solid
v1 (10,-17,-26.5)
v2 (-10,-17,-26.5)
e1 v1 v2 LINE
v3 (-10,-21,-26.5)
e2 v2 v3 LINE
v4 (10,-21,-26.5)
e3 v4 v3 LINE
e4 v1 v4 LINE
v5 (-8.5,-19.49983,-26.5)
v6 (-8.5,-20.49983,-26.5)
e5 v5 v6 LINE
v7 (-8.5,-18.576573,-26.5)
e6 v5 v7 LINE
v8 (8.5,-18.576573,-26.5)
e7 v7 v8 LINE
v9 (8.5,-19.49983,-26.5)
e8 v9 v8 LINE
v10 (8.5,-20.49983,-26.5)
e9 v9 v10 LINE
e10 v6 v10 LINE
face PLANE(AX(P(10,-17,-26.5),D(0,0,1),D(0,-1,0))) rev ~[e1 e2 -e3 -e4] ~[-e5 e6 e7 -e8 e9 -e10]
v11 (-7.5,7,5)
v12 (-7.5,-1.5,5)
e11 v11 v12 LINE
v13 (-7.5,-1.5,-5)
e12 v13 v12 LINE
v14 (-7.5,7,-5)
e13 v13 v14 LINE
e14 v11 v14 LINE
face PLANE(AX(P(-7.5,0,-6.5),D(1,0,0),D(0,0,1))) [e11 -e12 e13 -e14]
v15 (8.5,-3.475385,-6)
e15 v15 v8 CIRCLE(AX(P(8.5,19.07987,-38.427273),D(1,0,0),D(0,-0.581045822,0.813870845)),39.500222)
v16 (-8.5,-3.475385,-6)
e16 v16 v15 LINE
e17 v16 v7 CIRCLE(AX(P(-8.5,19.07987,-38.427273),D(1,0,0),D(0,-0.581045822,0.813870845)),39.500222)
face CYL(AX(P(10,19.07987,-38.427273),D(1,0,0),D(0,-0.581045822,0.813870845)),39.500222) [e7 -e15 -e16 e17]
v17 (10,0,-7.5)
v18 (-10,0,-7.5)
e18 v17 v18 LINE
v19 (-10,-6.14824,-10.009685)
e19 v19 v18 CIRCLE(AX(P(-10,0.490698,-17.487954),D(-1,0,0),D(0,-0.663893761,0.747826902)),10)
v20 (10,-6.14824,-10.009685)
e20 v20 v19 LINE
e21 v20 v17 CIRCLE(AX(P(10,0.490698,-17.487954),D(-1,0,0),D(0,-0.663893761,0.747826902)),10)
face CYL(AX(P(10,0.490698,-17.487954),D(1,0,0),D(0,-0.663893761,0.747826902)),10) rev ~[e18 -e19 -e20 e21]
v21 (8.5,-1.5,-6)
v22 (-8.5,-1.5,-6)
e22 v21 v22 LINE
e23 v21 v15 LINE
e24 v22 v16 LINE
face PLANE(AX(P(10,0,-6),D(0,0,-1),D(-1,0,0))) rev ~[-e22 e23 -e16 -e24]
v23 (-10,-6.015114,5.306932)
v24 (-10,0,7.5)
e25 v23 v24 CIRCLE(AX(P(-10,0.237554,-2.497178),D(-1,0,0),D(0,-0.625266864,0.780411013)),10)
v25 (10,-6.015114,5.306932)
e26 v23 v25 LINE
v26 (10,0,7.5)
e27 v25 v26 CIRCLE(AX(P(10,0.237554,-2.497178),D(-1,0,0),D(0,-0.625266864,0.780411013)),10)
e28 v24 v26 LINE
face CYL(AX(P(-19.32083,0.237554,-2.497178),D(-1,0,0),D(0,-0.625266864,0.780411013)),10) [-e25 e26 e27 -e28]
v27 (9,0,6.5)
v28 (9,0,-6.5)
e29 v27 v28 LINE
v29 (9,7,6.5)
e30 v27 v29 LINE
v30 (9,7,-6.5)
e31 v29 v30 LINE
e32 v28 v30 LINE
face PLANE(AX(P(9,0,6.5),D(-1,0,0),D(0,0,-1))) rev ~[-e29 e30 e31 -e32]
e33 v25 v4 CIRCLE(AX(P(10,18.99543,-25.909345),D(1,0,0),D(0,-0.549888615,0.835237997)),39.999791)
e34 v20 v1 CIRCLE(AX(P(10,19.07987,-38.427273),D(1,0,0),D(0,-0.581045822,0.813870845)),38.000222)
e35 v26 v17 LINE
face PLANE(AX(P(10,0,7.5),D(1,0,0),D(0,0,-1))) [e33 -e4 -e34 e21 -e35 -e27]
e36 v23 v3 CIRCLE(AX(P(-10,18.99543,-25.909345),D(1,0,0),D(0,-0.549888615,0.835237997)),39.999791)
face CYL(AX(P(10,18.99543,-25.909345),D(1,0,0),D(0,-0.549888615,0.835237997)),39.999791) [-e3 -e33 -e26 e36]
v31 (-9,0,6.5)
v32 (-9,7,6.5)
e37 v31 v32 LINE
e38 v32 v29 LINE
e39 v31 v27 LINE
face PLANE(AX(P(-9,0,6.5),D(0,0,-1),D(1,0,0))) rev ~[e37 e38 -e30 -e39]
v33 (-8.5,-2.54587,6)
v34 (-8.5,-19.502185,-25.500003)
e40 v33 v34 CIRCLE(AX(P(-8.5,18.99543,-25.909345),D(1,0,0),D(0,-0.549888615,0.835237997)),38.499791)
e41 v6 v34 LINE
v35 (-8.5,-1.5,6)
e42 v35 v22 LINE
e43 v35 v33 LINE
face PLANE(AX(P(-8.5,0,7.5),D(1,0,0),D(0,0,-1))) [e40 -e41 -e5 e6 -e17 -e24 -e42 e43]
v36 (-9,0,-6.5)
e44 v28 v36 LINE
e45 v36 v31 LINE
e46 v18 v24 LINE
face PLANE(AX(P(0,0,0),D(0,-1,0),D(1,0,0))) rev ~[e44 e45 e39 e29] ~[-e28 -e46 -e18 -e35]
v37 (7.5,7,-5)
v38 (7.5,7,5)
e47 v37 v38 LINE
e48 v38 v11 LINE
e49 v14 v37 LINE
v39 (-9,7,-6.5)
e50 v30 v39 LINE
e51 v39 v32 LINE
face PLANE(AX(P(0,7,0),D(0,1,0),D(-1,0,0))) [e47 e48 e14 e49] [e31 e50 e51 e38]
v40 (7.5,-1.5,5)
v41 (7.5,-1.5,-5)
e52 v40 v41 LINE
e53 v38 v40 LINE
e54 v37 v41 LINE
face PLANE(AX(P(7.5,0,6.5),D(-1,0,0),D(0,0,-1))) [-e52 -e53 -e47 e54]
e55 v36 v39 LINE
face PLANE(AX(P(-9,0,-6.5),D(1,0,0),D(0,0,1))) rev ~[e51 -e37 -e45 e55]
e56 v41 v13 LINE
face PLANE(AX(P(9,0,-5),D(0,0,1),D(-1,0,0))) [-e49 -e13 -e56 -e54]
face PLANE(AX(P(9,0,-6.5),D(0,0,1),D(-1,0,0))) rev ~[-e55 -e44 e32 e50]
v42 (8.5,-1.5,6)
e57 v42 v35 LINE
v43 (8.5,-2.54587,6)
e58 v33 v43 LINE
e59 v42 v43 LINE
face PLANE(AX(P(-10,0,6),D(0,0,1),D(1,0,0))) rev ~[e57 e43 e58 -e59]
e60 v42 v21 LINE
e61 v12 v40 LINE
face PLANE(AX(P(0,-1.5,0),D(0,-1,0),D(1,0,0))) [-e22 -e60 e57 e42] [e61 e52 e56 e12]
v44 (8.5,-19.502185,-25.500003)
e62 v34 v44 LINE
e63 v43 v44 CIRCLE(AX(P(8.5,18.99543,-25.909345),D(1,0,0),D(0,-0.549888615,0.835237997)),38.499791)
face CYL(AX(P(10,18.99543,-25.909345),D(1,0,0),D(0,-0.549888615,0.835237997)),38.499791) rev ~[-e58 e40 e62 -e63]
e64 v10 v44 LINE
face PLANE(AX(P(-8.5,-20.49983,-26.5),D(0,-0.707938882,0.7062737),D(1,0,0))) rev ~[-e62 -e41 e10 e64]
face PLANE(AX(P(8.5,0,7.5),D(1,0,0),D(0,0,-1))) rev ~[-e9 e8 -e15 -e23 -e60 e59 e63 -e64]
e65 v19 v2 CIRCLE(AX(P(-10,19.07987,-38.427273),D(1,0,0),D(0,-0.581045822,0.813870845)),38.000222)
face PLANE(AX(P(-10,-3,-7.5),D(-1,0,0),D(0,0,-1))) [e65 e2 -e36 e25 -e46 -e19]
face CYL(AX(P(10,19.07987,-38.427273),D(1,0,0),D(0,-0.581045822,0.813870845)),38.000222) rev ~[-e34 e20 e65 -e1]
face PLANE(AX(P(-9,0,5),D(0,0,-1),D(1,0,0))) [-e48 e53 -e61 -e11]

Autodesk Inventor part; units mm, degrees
ref_plane "YZ Plane" through (0, 0, 0) normal (1, 0, 0) x (0, 1, 0)
ref_plane "XZ Plane" through (0, 0, 0) normal (0, 1, 0) x (-1, 0, 0)
ref_plane "XY Plane" through (0, 0, 0) normal (0, 0, 1) x (1, 0, 0)
sketch "Szkic1" plane through (0, 0, 0) normal (0, 1, 0) x (-1, 0, 0)
  line L0 (9, 6.5) -> (-9, 6.5)
  line L1 (-9, 6.5) -> (-9, -6.5)
  line L2 (-9, -6.5) -> (9, -6.5)
  line L3 (9, -6.5) -> (9, 6.5)
  line L4 (9, 0) -> (0, 0) construction
  line L5 (0, 0) -> (0, -6.5) construction
  dimension "d0" = 13
  dimension "d1" = 18
extrude "Wyciągnięcie proste1" add sketch "Szkic1" along normal blind 7
sketch "Szkic2" plane through (0, 0, 0) normal (0, -1, 0) x (1, 0, 0)
  line L0 (-10, 7.5) -> (10, 7.5)
  line L1 (10, 7.5) -> (10, -7.5)
  line L2 (10, -7.5) -> (-10, -7.5)
  line L3 (-10, -7.5) -> (-10, 7.5)
  line L4 (0, 7.5) -> (0, 0) construction
  line L5 (0, 0) -> (10, 0) construction
  dimension "d4" = 20
  dimension "d5" = 15
extrude "Wyciągnięcie proste2" add sketch "Szkic2" along normal blind 3
sketch "Szkic3" plane through (10, 0, 7.5) normal (1, 0, 0) x (0, 0, -1)
  line L0 (0, 0) -> (0, -3) projected
  arc A0 (0, -3) -> (34, -21) centre (33.4095, 18.9956) ccw
  line L1 (1, 7) -> (14, 7) projected
  line L2 (0, -3) -> (15, -3) projected
  arc A1 (15, -3) -> (34, -17) centre (45.9271, 19.0797) ccw
  line L3 (34, -17) -> (34, -21)
  line L4 (15, 0) -> (15, -3) projected
  line L5 (0, -3) -> (15, -3)
  point P0 (7.5, 0)
  dimension "d10" = 34
  dimension "d11" = 40
  dimension "d12" = 28
  dimension "d13" = 4
  dimension "d14" = 38
extrude "Wyciągnięcie proste3" add sketch "Szkic3" against normal up to surface (20 mm away)
shell "Skorupa1" thickness 1.5 removed faces 2 at (-3, 7, 2.1667) at (-3.3333, -19.6667, -26.5)
fillet "Zaokrąglenie1" radius 10 2 edges at (0, -3, -7.5) (0, -3, 7.5)
chamfer "Faza1" distance 1 angle 45 1 edges at (0, -19.4998, -26.5)
properties part number "45_dysza chłodząca"
